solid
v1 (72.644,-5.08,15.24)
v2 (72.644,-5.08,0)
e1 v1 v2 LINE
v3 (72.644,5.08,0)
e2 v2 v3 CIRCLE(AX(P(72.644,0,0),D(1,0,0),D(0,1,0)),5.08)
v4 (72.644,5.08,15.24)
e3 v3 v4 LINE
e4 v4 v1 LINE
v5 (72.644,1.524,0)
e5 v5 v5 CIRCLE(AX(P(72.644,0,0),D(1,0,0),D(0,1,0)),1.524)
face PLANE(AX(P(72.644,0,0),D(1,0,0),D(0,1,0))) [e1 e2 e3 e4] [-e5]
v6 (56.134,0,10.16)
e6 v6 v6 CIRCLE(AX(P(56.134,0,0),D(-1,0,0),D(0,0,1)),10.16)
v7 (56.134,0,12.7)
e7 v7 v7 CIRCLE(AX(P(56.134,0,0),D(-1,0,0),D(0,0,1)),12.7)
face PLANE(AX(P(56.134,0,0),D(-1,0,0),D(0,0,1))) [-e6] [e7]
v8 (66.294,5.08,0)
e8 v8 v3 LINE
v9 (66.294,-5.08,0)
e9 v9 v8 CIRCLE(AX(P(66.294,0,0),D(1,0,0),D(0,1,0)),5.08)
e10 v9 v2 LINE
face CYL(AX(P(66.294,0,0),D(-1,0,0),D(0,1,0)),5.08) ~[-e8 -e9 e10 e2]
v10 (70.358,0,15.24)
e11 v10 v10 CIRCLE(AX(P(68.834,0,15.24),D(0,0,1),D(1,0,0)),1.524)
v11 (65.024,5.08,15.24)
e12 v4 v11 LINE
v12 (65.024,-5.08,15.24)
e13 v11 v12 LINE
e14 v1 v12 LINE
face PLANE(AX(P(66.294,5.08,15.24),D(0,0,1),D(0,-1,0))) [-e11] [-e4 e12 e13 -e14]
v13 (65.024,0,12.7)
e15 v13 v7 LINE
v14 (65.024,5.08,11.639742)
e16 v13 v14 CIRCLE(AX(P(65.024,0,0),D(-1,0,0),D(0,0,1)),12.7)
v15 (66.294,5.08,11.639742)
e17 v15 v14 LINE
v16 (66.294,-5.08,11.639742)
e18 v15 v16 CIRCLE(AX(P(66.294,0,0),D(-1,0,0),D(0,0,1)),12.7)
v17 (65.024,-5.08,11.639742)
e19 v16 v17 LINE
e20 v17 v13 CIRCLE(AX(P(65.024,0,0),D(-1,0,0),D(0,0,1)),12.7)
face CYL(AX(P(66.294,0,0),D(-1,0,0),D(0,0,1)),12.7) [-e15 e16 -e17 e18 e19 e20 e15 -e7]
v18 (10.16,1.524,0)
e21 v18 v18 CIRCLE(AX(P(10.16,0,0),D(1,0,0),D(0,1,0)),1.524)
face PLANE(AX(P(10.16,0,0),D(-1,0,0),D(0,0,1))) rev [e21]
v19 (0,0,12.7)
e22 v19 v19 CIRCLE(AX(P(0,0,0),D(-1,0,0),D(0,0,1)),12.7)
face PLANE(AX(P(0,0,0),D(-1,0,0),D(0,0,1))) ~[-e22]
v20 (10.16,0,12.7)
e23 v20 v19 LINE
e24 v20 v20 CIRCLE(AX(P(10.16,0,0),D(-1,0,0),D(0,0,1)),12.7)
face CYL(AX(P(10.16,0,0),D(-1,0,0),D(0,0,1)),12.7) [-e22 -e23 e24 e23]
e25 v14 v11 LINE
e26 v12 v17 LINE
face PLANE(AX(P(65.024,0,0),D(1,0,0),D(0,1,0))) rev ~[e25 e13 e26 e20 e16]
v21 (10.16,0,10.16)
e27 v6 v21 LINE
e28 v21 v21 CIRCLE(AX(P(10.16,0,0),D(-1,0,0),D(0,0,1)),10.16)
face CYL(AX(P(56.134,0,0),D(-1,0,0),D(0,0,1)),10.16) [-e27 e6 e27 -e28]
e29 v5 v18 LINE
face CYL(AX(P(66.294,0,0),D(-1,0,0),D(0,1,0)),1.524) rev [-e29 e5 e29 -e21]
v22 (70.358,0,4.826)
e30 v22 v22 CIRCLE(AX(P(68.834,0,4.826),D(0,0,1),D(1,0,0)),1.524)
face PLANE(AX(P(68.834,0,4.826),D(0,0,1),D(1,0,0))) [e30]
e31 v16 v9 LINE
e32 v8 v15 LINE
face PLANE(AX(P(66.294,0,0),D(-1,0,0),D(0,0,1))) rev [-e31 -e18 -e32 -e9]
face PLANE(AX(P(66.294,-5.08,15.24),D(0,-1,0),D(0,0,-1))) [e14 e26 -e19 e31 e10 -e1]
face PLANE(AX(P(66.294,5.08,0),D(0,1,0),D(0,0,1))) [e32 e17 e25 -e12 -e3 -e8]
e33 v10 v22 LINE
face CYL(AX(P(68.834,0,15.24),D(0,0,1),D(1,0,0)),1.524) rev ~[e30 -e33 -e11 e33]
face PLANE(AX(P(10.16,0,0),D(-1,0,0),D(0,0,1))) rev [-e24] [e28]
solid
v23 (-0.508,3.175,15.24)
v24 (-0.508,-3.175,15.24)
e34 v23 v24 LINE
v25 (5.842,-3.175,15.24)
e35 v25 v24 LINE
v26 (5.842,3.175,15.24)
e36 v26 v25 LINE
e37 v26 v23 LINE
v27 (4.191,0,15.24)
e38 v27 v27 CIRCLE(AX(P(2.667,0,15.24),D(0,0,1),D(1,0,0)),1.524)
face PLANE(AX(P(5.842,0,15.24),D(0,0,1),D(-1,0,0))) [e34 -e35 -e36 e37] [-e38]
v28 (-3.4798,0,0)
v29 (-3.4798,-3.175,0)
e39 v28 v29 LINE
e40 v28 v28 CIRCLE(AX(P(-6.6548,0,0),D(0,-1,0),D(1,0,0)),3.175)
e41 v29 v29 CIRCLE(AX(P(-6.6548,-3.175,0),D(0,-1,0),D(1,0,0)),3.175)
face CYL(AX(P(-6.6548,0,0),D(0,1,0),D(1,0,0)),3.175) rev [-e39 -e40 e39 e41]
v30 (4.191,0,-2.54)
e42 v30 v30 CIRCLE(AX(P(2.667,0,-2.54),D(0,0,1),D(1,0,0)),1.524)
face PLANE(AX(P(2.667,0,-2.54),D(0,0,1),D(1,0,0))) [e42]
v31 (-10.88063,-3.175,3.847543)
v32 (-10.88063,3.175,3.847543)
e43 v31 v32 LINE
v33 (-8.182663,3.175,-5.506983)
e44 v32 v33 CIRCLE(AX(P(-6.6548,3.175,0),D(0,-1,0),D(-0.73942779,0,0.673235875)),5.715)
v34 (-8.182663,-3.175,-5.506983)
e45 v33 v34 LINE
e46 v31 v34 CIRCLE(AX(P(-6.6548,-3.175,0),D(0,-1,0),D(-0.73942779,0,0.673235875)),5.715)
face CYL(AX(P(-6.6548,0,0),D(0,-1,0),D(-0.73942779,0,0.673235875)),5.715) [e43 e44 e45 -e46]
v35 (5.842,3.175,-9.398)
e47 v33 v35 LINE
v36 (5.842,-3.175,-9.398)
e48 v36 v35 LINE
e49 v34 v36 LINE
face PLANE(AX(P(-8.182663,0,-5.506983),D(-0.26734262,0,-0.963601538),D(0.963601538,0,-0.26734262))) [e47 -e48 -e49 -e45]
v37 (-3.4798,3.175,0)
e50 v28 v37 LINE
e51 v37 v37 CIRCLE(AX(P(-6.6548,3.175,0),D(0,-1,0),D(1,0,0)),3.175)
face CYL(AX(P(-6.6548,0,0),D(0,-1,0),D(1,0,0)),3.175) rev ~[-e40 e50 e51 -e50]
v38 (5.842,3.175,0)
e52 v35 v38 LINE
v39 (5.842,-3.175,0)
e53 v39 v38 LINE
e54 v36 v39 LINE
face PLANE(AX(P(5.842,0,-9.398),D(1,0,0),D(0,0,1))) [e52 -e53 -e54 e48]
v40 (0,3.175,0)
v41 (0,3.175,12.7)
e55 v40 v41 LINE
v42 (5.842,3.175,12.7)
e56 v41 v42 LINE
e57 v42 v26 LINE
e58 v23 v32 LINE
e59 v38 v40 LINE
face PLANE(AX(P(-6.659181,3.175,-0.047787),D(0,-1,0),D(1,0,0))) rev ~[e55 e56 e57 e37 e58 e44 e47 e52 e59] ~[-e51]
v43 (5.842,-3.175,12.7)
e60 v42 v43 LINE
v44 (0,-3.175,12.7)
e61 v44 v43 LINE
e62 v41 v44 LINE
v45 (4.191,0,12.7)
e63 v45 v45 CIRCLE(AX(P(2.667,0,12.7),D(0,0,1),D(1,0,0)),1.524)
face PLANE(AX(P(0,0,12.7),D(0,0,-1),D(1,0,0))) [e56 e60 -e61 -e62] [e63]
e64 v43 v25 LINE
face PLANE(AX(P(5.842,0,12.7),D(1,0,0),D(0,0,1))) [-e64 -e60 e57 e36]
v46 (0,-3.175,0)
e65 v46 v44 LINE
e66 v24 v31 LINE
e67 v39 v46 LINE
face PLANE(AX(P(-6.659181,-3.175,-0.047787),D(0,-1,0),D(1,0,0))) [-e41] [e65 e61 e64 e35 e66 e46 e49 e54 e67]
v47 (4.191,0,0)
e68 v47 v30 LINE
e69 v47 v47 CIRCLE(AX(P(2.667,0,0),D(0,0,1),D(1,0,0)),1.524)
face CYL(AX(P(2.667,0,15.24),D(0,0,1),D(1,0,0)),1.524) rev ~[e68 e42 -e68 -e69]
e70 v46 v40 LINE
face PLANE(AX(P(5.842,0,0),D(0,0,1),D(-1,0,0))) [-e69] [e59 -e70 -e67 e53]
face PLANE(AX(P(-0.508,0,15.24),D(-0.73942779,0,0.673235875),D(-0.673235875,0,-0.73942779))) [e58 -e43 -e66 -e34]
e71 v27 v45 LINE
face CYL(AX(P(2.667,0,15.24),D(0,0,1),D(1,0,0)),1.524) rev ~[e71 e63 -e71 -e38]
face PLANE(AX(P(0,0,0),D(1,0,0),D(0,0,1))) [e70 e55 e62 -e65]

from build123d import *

# Parameters (mm, degrees)
F0_W          = 5.842
F0_H          = 12.7
F2_DEPTH      = 3.175
F2_DEPTH_BACK = 3.175
F0_R          = 3.175
F3_DEPTH      = 3.175
F3_DEPTH_BACK = 3.175
F4_R          = 1.524
F5_DEPTH      = 6.35
F5_DEPTH_BACK = 1.27
F6_DEPTH      = 56.134
F7_R          = 1.524
F8_DEPTH      = 17.78
F9_R          = 1.524
F10_DEPTH     = 10.414


with BuildPart() as f1:
    # F0 (on Front) → F1 (revolve)
    with BuildSketch(Plane.XZ):
        with Locations((2.921, 6.35)):
            Rectangle(F0_W, F0_H)
        Polygon((5.842, 12.7), (5.842, 0), (66.294, 0), (66.294, 12.7), (56.134, 12.7), (56.134, 10.16), (10.16, 10.16), (10.16, 12.7), align=None)
    revolve(axis=Axis((-3.3274, 0, 0), (-1, 0, 0)))

    # F4 (on face) → F5 (join, two sides)
    with BuildSketch(Plane.YZ.offset(66.294)) as f5_sk:
        with BuildLine():
            ThreePointArc((-5.08, 0), (0, -5.08), (5.08, 0))
            ThreePointArc((5.08, 0), (0, 5.08), (-5.08, 0))
        make_face()
        Circle(F4_R, mode=Mode.SUBTRACT)
        with BuildLine():
            ThreePointArc((-5.08, 0), (0, 5.08), (5.08, 0))
            Line((5.08, 0), (5.08, 15.24))
            Line((5.08, 15.24), (-5.08, 15.24))
            Line((-5.08, 15.24), (-5.08, 0))
        make_face()
    extrude(amount=F5_DEPTH)
    extrude(f5_sk.sketch, amount=-F5_DEPTH_BACK)

    # F6 (cut, through all): a face of the model
    f6_faces = [f1.faces().sort_by_distance(p)[0] for p in [
        (66.294, 0, 0),
    ]]
    extrude(f6_faces, amount=-F6_DEPTH, mode=Mode.SUBTRACT)

    # F9 (on face) → F10 (cut)
    with BuildSketch(Plane.XY.offset(15.24)):
        with Locations((68.834, 0)):
            Circle(F9_R)
    extrude(amount=-F10_DEPTH, mode=Mode.SUBTRACT)


with BuildPart() as f2:
    # F0 (on Front) → F2 (new body, two sides)
    with BuildSketch(Plane.XZ) as f2_sk:
        with BuildLine():
            Line((-0.9398, 0), (0, 0))
            Line((0, 0), (0, 12.7))
            Line((0, 12.7), (5.842, 12.7))
            Line((5.842, 12.7), (5.842, 15.24))
            Line((5.842, 15.24), (-0.508, 15.24))
            Line((-0.508, 15.24), (-10.8806298187, 3.8475430269))
            ThreePointArc((-10.8806298187, 3.8475430269), (-4.5919612295, 5.3297205562), (-0.9398, 0))
        make_face()
        with BuildLine():
            Line((5.842, 0), (0, 0))
            Line((0, 0), (-0.9398, 0))
            ThreePointArc((-0.9398, 0), (-3.1957909266, -4.5493385486), (-8.1826630726, -5.5069827884))
            Line((-8.1826630726, -5.5069827884), (5.842, -9.398))
            Line((5.842, -9.398), (5.842, 0))
        make_face()
    extrude(amount=F2_DEPTH)
    extrude(f2_sk.sketch, amount=-F2_DEPTH_BACK)

    # F0 (on Front) → F3 (join, two sides)
    with BuildSketch(Plane.XZ) as f3_sk:
        with BuildLine():
            ThreePointArc((-8.1826630726, -5.5069827884), (-3.1957909266, -4.5493385486), (-0.9398, 0))
            ThreePointArc((-0.9398, 0), (-4.5919612295, 5.3297205562), (-10.8806298187, 3.8475430269))
            ThreePointArc((-10.8806298187, 3.8475430269), (-12.1459778134, -1.5837270034), (-8.1826630726, -5.5069827884))
        make_face()
        with Locations((-6.6548, 0)):
            Circle(F0_R, mode=Mode.SUBTRACT)
    extrude(amount=F3_DEPTH)
    extrude(f3_sk.sketch, amount=-F3_DEPTH_BACK)

    # F7 (on face) → F8 (cut)
    with BuildSketch(Plane.XY.offset(15.24)):
        with Locations((2.667, 0)):
            Circle(F7_R)
    extrude(amount=-F8_DEPTH, mode=Mode.SUBTRACT)


solid = Compound([f1.part, f2.part])
